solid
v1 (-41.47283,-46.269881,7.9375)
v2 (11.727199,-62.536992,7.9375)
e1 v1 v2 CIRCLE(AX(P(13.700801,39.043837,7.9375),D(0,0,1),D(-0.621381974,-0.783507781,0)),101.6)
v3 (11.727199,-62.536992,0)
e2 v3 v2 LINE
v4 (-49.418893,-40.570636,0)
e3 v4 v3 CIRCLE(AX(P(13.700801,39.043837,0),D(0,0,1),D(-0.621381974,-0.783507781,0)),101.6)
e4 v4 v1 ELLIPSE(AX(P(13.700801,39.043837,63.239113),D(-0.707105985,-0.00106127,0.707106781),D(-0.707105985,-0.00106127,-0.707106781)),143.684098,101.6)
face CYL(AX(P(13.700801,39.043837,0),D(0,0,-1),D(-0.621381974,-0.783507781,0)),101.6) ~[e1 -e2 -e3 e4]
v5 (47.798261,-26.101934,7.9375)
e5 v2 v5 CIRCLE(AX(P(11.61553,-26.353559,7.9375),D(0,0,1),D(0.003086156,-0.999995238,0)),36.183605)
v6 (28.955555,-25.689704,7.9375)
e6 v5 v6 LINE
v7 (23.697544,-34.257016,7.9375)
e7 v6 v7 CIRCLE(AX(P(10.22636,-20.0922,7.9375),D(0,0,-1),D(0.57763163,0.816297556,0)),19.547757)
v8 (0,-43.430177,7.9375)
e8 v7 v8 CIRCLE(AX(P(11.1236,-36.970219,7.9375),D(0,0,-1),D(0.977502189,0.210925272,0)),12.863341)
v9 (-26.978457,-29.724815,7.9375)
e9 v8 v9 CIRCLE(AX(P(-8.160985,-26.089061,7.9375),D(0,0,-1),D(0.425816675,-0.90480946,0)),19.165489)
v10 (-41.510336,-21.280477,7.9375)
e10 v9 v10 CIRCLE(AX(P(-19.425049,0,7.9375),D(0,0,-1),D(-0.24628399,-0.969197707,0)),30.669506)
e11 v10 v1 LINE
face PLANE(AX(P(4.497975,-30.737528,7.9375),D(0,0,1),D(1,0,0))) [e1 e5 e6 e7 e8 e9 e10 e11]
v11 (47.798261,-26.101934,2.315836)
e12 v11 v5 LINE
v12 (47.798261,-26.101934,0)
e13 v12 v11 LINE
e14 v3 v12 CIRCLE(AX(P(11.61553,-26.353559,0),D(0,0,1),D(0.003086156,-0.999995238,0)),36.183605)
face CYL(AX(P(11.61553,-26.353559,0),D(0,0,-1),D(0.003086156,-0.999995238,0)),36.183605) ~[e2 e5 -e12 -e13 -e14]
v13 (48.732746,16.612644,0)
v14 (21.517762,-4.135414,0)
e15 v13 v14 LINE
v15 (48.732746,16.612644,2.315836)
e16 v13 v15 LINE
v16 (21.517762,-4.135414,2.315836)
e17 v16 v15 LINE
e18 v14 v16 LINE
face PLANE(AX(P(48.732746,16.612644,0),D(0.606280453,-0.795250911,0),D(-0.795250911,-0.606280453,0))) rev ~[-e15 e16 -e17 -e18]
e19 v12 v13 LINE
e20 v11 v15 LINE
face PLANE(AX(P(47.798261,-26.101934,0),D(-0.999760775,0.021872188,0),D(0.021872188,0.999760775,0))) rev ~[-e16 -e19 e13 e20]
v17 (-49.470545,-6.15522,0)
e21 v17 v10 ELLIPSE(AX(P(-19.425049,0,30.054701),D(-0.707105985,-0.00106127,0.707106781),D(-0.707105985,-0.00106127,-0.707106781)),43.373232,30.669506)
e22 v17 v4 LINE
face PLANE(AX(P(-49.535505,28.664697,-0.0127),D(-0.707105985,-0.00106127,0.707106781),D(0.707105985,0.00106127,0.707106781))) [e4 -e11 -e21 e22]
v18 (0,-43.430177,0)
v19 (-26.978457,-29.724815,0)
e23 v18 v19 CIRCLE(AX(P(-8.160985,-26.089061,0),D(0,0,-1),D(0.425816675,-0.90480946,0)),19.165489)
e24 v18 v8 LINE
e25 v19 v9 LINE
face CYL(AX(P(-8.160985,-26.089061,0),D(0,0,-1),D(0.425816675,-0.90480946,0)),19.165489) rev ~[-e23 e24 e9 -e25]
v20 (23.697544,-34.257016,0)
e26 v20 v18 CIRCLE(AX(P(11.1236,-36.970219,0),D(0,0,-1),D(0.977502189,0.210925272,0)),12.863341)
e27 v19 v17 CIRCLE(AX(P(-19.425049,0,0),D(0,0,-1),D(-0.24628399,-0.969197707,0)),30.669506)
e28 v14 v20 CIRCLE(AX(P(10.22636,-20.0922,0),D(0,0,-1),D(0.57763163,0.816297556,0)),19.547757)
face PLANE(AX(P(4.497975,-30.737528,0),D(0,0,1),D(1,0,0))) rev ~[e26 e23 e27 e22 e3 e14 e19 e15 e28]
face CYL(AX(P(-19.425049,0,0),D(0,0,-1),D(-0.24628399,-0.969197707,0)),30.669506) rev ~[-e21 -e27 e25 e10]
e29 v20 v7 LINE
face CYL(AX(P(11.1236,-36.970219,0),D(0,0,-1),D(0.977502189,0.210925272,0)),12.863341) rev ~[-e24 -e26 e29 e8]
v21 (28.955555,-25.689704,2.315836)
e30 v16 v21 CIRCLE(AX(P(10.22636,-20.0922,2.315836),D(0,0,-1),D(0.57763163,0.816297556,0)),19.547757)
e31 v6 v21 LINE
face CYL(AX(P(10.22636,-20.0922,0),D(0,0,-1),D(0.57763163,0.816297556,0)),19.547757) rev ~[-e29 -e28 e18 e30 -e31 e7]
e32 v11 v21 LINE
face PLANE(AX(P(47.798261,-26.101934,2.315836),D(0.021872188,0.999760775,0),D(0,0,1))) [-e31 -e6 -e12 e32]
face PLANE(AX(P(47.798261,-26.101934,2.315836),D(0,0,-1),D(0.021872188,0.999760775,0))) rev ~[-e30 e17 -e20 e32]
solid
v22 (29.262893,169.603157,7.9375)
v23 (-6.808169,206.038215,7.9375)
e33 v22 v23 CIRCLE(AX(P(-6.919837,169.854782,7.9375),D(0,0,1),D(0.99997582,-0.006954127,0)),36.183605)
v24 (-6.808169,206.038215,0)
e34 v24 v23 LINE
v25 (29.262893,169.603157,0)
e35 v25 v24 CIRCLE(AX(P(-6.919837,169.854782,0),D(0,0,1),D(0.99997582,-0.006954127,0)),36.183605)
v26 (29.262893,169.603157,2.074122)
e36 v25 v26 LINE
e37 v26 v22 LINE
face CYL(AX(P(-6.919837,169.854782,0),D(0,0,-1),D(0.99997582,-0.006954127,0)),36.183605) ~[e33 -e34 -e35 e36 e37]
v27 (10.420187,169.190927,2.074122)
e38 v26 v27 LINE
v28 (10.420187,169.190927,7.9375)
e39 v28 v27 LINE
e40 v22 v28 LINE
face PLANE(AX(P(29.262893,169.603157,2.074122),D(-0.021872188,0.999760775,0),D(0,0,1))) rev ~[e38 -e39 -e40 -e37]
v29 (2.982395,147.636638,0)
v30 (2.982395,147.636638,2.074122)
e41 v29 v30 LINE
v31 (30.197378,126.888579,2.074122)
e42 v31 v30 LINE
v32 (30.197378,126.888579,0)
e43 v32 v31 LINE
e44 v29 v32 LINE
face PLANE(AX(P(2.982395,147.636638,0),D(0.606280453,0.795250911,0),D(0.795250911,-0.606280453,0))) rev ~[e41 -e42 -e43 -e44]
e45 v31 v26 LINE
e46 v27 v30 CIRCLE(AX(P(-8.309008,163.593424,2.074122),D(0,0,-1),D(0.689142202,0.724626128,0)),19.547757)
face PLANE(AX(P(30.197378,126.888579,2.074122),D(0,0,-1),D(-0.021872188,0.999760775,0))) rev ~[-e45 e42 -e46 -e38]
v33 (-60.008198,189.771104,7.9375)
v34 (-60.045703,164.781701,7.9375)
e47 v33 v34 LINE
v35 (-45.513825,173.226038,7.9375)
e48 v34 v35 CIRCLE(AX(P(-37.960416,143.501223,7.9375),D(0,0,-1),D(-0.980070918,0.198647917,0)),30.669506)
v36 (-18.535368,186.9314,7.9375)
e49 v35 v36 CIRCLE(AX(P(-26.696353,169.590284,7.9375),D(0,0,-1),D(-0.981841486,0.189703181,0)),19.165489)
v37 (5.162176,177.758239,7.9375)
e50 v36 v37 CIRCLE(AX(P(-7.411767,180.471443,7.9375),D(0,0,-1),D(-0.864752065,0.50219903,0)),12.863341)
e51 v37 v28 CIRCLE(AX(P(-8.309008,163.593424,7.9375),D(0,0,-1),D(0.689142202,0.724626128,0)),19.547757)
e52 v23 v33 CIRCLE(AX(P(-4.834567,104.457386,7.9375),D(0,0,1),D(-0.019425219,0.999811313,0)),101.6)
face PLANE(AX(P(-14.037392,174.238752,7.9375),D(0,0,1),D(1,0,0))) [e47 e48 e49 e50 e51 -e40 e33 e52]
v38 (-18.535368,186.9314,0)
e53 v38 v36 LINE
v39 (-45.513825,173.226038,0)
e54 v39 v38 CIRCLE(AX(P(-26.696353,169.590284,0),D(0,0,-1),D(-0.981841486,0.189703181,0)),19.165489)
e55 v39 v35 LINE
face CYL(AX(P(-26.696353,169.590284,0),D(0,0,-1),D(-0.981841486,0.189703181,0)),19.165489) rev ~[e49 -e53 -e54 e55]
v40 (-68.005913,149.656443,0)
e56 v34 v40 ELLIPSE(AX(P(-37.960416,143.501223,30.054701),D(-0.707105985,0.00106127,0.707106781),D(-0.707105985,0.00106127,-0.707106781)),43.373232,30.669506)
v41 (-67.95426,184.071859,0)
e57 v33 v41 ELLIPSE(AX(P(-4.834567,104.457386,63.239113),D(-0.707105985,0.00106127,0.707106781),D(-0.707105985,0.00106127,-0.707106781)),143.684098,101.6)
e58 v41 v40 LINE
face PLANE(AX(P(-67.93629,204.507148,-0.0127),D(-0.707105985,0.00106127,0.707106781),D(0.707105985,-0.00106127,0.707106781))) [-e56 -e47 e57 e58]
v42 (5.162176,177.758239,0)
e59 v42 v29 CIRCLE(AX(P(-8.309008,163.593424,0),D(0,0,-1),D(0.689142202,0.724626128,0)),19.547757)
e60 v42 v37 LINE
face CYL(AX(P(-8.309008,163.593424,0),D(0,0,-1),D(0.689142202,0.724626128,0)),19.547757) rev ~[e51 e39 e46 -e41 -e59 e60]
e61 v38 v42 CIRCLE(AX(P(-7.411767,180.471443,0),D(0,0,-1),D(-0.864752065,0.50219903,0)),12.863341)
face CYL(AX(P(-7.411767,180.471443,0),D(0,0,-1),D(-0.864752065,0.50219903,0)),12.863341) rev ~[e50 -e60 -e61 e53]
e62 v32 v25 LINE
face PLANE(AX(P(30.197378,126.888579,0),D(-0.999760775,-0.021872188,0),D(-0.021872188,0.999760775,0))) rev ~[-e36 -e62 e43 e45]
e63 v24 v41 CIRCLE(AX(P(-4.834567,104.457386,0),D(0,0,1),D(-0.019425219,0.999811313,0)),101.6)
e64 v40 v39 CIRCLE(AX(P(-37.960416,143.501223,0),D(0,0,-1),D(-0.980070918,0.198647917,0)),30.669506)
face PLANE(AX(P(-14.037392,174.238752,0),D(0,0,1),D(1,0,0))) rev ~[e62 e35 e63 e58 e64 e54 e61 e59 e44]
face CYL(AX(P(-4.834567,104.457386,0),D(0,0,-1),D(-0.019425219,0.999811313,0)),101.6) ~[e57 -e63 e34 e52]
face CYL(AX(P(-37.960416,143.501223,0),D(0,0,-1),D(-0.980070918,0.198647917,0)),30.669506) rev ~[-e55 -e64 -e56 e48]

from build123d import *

# Parameters (mm, degrees)
F1_DEPTH    = 7.9375
F3_DEPTH    = 7.9375
F4_T1_DEPTH = 89.6707225602
F5_T1_DEPTH = 89.6707225602
F6_W        = 42.724798455
F6_H        = 5.6216642056
F7_DEPTH    = 27.68579
F8_W        = 42.724798455
F8_H        = 5.8633778039
F9_DEPTH    = 27.94


# Not quite as in the source:
# - a fillet or chamfer that OpenCascade refuses, or shapes differently, is made with other operations: its cross-section is extruded or revolved along the edge and cut away or added
# - a length typed as a fraction of an inch, garbled in the dataset ("3 / 203.2 mm" for 3/8 in), is restored


with BuildPart() as f1:
    # F0 (on Top) → F1 (new body)
    with BuildSketch(Plane.XY):
        with BuildLine():
            ThreePointArc((-49.4316077378, -40.5605532146), (-20.6567184189, -56.5706012946), (11.7271985223, -62.5369920277))
            ThreePointArc((11.7271985223, -62.5369920277), (37.3293245519, -51.810465344), (47.798260752, -26.1019335546))
            Line((47.798260752, -26.1019335546), (48.7327455768, 16.612644064))
            Line((48.7327455768, 16.612644064), (21.5177623814, -4.1354143294))
            ThreePointArc((21.5177623814, -4.1354143294), (29.7231324258, -18.6812958766), (23.6975439262, -34.2570157889))
            ThreePointArc((23.6975439262, -34.2570157889), (15.7671543171, -48.9661744477), (0, -43.4301765663))
            ThreePointArc((0, -43.4301765663), (-16.8413888709, -43.1760896289), (-26.9784570219, -29.7248150211))
            ThreePointArc((-26.9784570219, -29.7248150211), (-41.6350091938, -21.1503252784), (-49.4833397007, -6.0924335212))
            Line((-49.4833397007, -6.0924335212), (-49.4316077378, -40.5605532146))
        make_face()
    extrude(amount=F1_DEPTH)

    # F4: chamfer of 7.9502 on 1 edges, made by hand

    # F4_s2 → F4_t1 (cut)
    with BuildSketch(Plane(origin=(-0.0431333008, 28.7389786103, 0), x_dir=(0, 0, 1), z_dir=(0.0015008624, -0.9999988737, 0))):
        Polygon((-0.0127, 49.4924278722), (7.9375, 41.5422278722), (7.9375, 49.4924278722), align=None)
    extrude(amount=F4_T1_DEPTH, mode=Mode.SUBTRACT)

    # F6 (on face) → F7 (cut)
    with BuildSketch(Plane(origin=(48.3461642406, -1.0576894198, 0), x_dir=(0.021872188, 0.9997607751, 0), z_dir=(0.9997607751, -0.021872188, 0))):
        with Locations((-3.6878375481, 5.1266678972)):
            Rectangle(F6_W, F6_H)
    extrude(amount=-F7_DEPTH, mode=Mode.SUBTRACT)


with BuildPart() as f3:
    # F2 (on Top) → F3 (new body)
    with BuildSketch(Plane.XY):
        with BuildLine():
            ThreePointArc((-45.513824769, 173.2260384447), (-35.376756618, 186.6773130525), (-18.5353677471, 186.9313999898))
            ThreePointArc((-18.5353677471, 186.9313999898), (-2.76821343, 192.4673978713), (5.1621761791, 177.7582392125))
            ThreePointArc((5.1621761791, 177.7582392125), (11.1877646787, 162.1825193002), (2.9823946343, 147.6366377529))
            Line((2.9823946343, 147.6366377529), (30.1973778297, 126.8885793596))
            Line((30.1973778297, 126.8885793596), (29.2628930049, 169.6031569781))
            ThreePointArc((29.2628930049, 169.6031569781), (18.7939568048, 195.3116887676), (-6.8081692248, 206.0382154513))
            ThreePointArc((-6.8081692248, 206.0382154513), (-39.192086166, 200.0718247182), (-67.9669754849, 184.0617766382))
            Line((-67.9669754849, 184.0617766382), (-68.0187074477, 149.5936569448))
            ThreePointArc((-68.0187074477, 149.5936569448), (-60.1703769409, 164.651548702), (-45.513824769, 173.2260384447))
        make_face()
    extrude(amount=F3_DEPTH)

    # F5: chamfer of 7.9502 on 1 edges, made by hand

    # F5_s2 → F5_t1 (cut)
    with BuildSketch(Plane(origin=(0.306783709, 204.4047241236, 0), x_dir=(0, 0, 1), z_dir=(-0.0015008624, -0.9999988737, 0))):
        Polygon((-0.0127, 68.2431503326), (7.9375, 60.2929503326), (7.9375, 68.2431503326), align=None)
    extrude(amount=F5_T1_DEPTH, mode=Mode.SUBTRACT)

    # F8 (on face) → F9 (cut)
    with BuildSketch(Plane(origin=(32.9575985639, 0.7210272801, 0), x_dir=(-0.021872188, 0.9997607751, 0), z_dir=(0.9997607751, 0.021872188, 0))):
        with Locations((147.5601409515, 5.005811098)):
            Rectangle(F8_W, F8_H)
    extrude(amount=-F9_DEPTH, mode=Mode.SUBTRACT)


solid = Compound([f1.part, f3.part])
